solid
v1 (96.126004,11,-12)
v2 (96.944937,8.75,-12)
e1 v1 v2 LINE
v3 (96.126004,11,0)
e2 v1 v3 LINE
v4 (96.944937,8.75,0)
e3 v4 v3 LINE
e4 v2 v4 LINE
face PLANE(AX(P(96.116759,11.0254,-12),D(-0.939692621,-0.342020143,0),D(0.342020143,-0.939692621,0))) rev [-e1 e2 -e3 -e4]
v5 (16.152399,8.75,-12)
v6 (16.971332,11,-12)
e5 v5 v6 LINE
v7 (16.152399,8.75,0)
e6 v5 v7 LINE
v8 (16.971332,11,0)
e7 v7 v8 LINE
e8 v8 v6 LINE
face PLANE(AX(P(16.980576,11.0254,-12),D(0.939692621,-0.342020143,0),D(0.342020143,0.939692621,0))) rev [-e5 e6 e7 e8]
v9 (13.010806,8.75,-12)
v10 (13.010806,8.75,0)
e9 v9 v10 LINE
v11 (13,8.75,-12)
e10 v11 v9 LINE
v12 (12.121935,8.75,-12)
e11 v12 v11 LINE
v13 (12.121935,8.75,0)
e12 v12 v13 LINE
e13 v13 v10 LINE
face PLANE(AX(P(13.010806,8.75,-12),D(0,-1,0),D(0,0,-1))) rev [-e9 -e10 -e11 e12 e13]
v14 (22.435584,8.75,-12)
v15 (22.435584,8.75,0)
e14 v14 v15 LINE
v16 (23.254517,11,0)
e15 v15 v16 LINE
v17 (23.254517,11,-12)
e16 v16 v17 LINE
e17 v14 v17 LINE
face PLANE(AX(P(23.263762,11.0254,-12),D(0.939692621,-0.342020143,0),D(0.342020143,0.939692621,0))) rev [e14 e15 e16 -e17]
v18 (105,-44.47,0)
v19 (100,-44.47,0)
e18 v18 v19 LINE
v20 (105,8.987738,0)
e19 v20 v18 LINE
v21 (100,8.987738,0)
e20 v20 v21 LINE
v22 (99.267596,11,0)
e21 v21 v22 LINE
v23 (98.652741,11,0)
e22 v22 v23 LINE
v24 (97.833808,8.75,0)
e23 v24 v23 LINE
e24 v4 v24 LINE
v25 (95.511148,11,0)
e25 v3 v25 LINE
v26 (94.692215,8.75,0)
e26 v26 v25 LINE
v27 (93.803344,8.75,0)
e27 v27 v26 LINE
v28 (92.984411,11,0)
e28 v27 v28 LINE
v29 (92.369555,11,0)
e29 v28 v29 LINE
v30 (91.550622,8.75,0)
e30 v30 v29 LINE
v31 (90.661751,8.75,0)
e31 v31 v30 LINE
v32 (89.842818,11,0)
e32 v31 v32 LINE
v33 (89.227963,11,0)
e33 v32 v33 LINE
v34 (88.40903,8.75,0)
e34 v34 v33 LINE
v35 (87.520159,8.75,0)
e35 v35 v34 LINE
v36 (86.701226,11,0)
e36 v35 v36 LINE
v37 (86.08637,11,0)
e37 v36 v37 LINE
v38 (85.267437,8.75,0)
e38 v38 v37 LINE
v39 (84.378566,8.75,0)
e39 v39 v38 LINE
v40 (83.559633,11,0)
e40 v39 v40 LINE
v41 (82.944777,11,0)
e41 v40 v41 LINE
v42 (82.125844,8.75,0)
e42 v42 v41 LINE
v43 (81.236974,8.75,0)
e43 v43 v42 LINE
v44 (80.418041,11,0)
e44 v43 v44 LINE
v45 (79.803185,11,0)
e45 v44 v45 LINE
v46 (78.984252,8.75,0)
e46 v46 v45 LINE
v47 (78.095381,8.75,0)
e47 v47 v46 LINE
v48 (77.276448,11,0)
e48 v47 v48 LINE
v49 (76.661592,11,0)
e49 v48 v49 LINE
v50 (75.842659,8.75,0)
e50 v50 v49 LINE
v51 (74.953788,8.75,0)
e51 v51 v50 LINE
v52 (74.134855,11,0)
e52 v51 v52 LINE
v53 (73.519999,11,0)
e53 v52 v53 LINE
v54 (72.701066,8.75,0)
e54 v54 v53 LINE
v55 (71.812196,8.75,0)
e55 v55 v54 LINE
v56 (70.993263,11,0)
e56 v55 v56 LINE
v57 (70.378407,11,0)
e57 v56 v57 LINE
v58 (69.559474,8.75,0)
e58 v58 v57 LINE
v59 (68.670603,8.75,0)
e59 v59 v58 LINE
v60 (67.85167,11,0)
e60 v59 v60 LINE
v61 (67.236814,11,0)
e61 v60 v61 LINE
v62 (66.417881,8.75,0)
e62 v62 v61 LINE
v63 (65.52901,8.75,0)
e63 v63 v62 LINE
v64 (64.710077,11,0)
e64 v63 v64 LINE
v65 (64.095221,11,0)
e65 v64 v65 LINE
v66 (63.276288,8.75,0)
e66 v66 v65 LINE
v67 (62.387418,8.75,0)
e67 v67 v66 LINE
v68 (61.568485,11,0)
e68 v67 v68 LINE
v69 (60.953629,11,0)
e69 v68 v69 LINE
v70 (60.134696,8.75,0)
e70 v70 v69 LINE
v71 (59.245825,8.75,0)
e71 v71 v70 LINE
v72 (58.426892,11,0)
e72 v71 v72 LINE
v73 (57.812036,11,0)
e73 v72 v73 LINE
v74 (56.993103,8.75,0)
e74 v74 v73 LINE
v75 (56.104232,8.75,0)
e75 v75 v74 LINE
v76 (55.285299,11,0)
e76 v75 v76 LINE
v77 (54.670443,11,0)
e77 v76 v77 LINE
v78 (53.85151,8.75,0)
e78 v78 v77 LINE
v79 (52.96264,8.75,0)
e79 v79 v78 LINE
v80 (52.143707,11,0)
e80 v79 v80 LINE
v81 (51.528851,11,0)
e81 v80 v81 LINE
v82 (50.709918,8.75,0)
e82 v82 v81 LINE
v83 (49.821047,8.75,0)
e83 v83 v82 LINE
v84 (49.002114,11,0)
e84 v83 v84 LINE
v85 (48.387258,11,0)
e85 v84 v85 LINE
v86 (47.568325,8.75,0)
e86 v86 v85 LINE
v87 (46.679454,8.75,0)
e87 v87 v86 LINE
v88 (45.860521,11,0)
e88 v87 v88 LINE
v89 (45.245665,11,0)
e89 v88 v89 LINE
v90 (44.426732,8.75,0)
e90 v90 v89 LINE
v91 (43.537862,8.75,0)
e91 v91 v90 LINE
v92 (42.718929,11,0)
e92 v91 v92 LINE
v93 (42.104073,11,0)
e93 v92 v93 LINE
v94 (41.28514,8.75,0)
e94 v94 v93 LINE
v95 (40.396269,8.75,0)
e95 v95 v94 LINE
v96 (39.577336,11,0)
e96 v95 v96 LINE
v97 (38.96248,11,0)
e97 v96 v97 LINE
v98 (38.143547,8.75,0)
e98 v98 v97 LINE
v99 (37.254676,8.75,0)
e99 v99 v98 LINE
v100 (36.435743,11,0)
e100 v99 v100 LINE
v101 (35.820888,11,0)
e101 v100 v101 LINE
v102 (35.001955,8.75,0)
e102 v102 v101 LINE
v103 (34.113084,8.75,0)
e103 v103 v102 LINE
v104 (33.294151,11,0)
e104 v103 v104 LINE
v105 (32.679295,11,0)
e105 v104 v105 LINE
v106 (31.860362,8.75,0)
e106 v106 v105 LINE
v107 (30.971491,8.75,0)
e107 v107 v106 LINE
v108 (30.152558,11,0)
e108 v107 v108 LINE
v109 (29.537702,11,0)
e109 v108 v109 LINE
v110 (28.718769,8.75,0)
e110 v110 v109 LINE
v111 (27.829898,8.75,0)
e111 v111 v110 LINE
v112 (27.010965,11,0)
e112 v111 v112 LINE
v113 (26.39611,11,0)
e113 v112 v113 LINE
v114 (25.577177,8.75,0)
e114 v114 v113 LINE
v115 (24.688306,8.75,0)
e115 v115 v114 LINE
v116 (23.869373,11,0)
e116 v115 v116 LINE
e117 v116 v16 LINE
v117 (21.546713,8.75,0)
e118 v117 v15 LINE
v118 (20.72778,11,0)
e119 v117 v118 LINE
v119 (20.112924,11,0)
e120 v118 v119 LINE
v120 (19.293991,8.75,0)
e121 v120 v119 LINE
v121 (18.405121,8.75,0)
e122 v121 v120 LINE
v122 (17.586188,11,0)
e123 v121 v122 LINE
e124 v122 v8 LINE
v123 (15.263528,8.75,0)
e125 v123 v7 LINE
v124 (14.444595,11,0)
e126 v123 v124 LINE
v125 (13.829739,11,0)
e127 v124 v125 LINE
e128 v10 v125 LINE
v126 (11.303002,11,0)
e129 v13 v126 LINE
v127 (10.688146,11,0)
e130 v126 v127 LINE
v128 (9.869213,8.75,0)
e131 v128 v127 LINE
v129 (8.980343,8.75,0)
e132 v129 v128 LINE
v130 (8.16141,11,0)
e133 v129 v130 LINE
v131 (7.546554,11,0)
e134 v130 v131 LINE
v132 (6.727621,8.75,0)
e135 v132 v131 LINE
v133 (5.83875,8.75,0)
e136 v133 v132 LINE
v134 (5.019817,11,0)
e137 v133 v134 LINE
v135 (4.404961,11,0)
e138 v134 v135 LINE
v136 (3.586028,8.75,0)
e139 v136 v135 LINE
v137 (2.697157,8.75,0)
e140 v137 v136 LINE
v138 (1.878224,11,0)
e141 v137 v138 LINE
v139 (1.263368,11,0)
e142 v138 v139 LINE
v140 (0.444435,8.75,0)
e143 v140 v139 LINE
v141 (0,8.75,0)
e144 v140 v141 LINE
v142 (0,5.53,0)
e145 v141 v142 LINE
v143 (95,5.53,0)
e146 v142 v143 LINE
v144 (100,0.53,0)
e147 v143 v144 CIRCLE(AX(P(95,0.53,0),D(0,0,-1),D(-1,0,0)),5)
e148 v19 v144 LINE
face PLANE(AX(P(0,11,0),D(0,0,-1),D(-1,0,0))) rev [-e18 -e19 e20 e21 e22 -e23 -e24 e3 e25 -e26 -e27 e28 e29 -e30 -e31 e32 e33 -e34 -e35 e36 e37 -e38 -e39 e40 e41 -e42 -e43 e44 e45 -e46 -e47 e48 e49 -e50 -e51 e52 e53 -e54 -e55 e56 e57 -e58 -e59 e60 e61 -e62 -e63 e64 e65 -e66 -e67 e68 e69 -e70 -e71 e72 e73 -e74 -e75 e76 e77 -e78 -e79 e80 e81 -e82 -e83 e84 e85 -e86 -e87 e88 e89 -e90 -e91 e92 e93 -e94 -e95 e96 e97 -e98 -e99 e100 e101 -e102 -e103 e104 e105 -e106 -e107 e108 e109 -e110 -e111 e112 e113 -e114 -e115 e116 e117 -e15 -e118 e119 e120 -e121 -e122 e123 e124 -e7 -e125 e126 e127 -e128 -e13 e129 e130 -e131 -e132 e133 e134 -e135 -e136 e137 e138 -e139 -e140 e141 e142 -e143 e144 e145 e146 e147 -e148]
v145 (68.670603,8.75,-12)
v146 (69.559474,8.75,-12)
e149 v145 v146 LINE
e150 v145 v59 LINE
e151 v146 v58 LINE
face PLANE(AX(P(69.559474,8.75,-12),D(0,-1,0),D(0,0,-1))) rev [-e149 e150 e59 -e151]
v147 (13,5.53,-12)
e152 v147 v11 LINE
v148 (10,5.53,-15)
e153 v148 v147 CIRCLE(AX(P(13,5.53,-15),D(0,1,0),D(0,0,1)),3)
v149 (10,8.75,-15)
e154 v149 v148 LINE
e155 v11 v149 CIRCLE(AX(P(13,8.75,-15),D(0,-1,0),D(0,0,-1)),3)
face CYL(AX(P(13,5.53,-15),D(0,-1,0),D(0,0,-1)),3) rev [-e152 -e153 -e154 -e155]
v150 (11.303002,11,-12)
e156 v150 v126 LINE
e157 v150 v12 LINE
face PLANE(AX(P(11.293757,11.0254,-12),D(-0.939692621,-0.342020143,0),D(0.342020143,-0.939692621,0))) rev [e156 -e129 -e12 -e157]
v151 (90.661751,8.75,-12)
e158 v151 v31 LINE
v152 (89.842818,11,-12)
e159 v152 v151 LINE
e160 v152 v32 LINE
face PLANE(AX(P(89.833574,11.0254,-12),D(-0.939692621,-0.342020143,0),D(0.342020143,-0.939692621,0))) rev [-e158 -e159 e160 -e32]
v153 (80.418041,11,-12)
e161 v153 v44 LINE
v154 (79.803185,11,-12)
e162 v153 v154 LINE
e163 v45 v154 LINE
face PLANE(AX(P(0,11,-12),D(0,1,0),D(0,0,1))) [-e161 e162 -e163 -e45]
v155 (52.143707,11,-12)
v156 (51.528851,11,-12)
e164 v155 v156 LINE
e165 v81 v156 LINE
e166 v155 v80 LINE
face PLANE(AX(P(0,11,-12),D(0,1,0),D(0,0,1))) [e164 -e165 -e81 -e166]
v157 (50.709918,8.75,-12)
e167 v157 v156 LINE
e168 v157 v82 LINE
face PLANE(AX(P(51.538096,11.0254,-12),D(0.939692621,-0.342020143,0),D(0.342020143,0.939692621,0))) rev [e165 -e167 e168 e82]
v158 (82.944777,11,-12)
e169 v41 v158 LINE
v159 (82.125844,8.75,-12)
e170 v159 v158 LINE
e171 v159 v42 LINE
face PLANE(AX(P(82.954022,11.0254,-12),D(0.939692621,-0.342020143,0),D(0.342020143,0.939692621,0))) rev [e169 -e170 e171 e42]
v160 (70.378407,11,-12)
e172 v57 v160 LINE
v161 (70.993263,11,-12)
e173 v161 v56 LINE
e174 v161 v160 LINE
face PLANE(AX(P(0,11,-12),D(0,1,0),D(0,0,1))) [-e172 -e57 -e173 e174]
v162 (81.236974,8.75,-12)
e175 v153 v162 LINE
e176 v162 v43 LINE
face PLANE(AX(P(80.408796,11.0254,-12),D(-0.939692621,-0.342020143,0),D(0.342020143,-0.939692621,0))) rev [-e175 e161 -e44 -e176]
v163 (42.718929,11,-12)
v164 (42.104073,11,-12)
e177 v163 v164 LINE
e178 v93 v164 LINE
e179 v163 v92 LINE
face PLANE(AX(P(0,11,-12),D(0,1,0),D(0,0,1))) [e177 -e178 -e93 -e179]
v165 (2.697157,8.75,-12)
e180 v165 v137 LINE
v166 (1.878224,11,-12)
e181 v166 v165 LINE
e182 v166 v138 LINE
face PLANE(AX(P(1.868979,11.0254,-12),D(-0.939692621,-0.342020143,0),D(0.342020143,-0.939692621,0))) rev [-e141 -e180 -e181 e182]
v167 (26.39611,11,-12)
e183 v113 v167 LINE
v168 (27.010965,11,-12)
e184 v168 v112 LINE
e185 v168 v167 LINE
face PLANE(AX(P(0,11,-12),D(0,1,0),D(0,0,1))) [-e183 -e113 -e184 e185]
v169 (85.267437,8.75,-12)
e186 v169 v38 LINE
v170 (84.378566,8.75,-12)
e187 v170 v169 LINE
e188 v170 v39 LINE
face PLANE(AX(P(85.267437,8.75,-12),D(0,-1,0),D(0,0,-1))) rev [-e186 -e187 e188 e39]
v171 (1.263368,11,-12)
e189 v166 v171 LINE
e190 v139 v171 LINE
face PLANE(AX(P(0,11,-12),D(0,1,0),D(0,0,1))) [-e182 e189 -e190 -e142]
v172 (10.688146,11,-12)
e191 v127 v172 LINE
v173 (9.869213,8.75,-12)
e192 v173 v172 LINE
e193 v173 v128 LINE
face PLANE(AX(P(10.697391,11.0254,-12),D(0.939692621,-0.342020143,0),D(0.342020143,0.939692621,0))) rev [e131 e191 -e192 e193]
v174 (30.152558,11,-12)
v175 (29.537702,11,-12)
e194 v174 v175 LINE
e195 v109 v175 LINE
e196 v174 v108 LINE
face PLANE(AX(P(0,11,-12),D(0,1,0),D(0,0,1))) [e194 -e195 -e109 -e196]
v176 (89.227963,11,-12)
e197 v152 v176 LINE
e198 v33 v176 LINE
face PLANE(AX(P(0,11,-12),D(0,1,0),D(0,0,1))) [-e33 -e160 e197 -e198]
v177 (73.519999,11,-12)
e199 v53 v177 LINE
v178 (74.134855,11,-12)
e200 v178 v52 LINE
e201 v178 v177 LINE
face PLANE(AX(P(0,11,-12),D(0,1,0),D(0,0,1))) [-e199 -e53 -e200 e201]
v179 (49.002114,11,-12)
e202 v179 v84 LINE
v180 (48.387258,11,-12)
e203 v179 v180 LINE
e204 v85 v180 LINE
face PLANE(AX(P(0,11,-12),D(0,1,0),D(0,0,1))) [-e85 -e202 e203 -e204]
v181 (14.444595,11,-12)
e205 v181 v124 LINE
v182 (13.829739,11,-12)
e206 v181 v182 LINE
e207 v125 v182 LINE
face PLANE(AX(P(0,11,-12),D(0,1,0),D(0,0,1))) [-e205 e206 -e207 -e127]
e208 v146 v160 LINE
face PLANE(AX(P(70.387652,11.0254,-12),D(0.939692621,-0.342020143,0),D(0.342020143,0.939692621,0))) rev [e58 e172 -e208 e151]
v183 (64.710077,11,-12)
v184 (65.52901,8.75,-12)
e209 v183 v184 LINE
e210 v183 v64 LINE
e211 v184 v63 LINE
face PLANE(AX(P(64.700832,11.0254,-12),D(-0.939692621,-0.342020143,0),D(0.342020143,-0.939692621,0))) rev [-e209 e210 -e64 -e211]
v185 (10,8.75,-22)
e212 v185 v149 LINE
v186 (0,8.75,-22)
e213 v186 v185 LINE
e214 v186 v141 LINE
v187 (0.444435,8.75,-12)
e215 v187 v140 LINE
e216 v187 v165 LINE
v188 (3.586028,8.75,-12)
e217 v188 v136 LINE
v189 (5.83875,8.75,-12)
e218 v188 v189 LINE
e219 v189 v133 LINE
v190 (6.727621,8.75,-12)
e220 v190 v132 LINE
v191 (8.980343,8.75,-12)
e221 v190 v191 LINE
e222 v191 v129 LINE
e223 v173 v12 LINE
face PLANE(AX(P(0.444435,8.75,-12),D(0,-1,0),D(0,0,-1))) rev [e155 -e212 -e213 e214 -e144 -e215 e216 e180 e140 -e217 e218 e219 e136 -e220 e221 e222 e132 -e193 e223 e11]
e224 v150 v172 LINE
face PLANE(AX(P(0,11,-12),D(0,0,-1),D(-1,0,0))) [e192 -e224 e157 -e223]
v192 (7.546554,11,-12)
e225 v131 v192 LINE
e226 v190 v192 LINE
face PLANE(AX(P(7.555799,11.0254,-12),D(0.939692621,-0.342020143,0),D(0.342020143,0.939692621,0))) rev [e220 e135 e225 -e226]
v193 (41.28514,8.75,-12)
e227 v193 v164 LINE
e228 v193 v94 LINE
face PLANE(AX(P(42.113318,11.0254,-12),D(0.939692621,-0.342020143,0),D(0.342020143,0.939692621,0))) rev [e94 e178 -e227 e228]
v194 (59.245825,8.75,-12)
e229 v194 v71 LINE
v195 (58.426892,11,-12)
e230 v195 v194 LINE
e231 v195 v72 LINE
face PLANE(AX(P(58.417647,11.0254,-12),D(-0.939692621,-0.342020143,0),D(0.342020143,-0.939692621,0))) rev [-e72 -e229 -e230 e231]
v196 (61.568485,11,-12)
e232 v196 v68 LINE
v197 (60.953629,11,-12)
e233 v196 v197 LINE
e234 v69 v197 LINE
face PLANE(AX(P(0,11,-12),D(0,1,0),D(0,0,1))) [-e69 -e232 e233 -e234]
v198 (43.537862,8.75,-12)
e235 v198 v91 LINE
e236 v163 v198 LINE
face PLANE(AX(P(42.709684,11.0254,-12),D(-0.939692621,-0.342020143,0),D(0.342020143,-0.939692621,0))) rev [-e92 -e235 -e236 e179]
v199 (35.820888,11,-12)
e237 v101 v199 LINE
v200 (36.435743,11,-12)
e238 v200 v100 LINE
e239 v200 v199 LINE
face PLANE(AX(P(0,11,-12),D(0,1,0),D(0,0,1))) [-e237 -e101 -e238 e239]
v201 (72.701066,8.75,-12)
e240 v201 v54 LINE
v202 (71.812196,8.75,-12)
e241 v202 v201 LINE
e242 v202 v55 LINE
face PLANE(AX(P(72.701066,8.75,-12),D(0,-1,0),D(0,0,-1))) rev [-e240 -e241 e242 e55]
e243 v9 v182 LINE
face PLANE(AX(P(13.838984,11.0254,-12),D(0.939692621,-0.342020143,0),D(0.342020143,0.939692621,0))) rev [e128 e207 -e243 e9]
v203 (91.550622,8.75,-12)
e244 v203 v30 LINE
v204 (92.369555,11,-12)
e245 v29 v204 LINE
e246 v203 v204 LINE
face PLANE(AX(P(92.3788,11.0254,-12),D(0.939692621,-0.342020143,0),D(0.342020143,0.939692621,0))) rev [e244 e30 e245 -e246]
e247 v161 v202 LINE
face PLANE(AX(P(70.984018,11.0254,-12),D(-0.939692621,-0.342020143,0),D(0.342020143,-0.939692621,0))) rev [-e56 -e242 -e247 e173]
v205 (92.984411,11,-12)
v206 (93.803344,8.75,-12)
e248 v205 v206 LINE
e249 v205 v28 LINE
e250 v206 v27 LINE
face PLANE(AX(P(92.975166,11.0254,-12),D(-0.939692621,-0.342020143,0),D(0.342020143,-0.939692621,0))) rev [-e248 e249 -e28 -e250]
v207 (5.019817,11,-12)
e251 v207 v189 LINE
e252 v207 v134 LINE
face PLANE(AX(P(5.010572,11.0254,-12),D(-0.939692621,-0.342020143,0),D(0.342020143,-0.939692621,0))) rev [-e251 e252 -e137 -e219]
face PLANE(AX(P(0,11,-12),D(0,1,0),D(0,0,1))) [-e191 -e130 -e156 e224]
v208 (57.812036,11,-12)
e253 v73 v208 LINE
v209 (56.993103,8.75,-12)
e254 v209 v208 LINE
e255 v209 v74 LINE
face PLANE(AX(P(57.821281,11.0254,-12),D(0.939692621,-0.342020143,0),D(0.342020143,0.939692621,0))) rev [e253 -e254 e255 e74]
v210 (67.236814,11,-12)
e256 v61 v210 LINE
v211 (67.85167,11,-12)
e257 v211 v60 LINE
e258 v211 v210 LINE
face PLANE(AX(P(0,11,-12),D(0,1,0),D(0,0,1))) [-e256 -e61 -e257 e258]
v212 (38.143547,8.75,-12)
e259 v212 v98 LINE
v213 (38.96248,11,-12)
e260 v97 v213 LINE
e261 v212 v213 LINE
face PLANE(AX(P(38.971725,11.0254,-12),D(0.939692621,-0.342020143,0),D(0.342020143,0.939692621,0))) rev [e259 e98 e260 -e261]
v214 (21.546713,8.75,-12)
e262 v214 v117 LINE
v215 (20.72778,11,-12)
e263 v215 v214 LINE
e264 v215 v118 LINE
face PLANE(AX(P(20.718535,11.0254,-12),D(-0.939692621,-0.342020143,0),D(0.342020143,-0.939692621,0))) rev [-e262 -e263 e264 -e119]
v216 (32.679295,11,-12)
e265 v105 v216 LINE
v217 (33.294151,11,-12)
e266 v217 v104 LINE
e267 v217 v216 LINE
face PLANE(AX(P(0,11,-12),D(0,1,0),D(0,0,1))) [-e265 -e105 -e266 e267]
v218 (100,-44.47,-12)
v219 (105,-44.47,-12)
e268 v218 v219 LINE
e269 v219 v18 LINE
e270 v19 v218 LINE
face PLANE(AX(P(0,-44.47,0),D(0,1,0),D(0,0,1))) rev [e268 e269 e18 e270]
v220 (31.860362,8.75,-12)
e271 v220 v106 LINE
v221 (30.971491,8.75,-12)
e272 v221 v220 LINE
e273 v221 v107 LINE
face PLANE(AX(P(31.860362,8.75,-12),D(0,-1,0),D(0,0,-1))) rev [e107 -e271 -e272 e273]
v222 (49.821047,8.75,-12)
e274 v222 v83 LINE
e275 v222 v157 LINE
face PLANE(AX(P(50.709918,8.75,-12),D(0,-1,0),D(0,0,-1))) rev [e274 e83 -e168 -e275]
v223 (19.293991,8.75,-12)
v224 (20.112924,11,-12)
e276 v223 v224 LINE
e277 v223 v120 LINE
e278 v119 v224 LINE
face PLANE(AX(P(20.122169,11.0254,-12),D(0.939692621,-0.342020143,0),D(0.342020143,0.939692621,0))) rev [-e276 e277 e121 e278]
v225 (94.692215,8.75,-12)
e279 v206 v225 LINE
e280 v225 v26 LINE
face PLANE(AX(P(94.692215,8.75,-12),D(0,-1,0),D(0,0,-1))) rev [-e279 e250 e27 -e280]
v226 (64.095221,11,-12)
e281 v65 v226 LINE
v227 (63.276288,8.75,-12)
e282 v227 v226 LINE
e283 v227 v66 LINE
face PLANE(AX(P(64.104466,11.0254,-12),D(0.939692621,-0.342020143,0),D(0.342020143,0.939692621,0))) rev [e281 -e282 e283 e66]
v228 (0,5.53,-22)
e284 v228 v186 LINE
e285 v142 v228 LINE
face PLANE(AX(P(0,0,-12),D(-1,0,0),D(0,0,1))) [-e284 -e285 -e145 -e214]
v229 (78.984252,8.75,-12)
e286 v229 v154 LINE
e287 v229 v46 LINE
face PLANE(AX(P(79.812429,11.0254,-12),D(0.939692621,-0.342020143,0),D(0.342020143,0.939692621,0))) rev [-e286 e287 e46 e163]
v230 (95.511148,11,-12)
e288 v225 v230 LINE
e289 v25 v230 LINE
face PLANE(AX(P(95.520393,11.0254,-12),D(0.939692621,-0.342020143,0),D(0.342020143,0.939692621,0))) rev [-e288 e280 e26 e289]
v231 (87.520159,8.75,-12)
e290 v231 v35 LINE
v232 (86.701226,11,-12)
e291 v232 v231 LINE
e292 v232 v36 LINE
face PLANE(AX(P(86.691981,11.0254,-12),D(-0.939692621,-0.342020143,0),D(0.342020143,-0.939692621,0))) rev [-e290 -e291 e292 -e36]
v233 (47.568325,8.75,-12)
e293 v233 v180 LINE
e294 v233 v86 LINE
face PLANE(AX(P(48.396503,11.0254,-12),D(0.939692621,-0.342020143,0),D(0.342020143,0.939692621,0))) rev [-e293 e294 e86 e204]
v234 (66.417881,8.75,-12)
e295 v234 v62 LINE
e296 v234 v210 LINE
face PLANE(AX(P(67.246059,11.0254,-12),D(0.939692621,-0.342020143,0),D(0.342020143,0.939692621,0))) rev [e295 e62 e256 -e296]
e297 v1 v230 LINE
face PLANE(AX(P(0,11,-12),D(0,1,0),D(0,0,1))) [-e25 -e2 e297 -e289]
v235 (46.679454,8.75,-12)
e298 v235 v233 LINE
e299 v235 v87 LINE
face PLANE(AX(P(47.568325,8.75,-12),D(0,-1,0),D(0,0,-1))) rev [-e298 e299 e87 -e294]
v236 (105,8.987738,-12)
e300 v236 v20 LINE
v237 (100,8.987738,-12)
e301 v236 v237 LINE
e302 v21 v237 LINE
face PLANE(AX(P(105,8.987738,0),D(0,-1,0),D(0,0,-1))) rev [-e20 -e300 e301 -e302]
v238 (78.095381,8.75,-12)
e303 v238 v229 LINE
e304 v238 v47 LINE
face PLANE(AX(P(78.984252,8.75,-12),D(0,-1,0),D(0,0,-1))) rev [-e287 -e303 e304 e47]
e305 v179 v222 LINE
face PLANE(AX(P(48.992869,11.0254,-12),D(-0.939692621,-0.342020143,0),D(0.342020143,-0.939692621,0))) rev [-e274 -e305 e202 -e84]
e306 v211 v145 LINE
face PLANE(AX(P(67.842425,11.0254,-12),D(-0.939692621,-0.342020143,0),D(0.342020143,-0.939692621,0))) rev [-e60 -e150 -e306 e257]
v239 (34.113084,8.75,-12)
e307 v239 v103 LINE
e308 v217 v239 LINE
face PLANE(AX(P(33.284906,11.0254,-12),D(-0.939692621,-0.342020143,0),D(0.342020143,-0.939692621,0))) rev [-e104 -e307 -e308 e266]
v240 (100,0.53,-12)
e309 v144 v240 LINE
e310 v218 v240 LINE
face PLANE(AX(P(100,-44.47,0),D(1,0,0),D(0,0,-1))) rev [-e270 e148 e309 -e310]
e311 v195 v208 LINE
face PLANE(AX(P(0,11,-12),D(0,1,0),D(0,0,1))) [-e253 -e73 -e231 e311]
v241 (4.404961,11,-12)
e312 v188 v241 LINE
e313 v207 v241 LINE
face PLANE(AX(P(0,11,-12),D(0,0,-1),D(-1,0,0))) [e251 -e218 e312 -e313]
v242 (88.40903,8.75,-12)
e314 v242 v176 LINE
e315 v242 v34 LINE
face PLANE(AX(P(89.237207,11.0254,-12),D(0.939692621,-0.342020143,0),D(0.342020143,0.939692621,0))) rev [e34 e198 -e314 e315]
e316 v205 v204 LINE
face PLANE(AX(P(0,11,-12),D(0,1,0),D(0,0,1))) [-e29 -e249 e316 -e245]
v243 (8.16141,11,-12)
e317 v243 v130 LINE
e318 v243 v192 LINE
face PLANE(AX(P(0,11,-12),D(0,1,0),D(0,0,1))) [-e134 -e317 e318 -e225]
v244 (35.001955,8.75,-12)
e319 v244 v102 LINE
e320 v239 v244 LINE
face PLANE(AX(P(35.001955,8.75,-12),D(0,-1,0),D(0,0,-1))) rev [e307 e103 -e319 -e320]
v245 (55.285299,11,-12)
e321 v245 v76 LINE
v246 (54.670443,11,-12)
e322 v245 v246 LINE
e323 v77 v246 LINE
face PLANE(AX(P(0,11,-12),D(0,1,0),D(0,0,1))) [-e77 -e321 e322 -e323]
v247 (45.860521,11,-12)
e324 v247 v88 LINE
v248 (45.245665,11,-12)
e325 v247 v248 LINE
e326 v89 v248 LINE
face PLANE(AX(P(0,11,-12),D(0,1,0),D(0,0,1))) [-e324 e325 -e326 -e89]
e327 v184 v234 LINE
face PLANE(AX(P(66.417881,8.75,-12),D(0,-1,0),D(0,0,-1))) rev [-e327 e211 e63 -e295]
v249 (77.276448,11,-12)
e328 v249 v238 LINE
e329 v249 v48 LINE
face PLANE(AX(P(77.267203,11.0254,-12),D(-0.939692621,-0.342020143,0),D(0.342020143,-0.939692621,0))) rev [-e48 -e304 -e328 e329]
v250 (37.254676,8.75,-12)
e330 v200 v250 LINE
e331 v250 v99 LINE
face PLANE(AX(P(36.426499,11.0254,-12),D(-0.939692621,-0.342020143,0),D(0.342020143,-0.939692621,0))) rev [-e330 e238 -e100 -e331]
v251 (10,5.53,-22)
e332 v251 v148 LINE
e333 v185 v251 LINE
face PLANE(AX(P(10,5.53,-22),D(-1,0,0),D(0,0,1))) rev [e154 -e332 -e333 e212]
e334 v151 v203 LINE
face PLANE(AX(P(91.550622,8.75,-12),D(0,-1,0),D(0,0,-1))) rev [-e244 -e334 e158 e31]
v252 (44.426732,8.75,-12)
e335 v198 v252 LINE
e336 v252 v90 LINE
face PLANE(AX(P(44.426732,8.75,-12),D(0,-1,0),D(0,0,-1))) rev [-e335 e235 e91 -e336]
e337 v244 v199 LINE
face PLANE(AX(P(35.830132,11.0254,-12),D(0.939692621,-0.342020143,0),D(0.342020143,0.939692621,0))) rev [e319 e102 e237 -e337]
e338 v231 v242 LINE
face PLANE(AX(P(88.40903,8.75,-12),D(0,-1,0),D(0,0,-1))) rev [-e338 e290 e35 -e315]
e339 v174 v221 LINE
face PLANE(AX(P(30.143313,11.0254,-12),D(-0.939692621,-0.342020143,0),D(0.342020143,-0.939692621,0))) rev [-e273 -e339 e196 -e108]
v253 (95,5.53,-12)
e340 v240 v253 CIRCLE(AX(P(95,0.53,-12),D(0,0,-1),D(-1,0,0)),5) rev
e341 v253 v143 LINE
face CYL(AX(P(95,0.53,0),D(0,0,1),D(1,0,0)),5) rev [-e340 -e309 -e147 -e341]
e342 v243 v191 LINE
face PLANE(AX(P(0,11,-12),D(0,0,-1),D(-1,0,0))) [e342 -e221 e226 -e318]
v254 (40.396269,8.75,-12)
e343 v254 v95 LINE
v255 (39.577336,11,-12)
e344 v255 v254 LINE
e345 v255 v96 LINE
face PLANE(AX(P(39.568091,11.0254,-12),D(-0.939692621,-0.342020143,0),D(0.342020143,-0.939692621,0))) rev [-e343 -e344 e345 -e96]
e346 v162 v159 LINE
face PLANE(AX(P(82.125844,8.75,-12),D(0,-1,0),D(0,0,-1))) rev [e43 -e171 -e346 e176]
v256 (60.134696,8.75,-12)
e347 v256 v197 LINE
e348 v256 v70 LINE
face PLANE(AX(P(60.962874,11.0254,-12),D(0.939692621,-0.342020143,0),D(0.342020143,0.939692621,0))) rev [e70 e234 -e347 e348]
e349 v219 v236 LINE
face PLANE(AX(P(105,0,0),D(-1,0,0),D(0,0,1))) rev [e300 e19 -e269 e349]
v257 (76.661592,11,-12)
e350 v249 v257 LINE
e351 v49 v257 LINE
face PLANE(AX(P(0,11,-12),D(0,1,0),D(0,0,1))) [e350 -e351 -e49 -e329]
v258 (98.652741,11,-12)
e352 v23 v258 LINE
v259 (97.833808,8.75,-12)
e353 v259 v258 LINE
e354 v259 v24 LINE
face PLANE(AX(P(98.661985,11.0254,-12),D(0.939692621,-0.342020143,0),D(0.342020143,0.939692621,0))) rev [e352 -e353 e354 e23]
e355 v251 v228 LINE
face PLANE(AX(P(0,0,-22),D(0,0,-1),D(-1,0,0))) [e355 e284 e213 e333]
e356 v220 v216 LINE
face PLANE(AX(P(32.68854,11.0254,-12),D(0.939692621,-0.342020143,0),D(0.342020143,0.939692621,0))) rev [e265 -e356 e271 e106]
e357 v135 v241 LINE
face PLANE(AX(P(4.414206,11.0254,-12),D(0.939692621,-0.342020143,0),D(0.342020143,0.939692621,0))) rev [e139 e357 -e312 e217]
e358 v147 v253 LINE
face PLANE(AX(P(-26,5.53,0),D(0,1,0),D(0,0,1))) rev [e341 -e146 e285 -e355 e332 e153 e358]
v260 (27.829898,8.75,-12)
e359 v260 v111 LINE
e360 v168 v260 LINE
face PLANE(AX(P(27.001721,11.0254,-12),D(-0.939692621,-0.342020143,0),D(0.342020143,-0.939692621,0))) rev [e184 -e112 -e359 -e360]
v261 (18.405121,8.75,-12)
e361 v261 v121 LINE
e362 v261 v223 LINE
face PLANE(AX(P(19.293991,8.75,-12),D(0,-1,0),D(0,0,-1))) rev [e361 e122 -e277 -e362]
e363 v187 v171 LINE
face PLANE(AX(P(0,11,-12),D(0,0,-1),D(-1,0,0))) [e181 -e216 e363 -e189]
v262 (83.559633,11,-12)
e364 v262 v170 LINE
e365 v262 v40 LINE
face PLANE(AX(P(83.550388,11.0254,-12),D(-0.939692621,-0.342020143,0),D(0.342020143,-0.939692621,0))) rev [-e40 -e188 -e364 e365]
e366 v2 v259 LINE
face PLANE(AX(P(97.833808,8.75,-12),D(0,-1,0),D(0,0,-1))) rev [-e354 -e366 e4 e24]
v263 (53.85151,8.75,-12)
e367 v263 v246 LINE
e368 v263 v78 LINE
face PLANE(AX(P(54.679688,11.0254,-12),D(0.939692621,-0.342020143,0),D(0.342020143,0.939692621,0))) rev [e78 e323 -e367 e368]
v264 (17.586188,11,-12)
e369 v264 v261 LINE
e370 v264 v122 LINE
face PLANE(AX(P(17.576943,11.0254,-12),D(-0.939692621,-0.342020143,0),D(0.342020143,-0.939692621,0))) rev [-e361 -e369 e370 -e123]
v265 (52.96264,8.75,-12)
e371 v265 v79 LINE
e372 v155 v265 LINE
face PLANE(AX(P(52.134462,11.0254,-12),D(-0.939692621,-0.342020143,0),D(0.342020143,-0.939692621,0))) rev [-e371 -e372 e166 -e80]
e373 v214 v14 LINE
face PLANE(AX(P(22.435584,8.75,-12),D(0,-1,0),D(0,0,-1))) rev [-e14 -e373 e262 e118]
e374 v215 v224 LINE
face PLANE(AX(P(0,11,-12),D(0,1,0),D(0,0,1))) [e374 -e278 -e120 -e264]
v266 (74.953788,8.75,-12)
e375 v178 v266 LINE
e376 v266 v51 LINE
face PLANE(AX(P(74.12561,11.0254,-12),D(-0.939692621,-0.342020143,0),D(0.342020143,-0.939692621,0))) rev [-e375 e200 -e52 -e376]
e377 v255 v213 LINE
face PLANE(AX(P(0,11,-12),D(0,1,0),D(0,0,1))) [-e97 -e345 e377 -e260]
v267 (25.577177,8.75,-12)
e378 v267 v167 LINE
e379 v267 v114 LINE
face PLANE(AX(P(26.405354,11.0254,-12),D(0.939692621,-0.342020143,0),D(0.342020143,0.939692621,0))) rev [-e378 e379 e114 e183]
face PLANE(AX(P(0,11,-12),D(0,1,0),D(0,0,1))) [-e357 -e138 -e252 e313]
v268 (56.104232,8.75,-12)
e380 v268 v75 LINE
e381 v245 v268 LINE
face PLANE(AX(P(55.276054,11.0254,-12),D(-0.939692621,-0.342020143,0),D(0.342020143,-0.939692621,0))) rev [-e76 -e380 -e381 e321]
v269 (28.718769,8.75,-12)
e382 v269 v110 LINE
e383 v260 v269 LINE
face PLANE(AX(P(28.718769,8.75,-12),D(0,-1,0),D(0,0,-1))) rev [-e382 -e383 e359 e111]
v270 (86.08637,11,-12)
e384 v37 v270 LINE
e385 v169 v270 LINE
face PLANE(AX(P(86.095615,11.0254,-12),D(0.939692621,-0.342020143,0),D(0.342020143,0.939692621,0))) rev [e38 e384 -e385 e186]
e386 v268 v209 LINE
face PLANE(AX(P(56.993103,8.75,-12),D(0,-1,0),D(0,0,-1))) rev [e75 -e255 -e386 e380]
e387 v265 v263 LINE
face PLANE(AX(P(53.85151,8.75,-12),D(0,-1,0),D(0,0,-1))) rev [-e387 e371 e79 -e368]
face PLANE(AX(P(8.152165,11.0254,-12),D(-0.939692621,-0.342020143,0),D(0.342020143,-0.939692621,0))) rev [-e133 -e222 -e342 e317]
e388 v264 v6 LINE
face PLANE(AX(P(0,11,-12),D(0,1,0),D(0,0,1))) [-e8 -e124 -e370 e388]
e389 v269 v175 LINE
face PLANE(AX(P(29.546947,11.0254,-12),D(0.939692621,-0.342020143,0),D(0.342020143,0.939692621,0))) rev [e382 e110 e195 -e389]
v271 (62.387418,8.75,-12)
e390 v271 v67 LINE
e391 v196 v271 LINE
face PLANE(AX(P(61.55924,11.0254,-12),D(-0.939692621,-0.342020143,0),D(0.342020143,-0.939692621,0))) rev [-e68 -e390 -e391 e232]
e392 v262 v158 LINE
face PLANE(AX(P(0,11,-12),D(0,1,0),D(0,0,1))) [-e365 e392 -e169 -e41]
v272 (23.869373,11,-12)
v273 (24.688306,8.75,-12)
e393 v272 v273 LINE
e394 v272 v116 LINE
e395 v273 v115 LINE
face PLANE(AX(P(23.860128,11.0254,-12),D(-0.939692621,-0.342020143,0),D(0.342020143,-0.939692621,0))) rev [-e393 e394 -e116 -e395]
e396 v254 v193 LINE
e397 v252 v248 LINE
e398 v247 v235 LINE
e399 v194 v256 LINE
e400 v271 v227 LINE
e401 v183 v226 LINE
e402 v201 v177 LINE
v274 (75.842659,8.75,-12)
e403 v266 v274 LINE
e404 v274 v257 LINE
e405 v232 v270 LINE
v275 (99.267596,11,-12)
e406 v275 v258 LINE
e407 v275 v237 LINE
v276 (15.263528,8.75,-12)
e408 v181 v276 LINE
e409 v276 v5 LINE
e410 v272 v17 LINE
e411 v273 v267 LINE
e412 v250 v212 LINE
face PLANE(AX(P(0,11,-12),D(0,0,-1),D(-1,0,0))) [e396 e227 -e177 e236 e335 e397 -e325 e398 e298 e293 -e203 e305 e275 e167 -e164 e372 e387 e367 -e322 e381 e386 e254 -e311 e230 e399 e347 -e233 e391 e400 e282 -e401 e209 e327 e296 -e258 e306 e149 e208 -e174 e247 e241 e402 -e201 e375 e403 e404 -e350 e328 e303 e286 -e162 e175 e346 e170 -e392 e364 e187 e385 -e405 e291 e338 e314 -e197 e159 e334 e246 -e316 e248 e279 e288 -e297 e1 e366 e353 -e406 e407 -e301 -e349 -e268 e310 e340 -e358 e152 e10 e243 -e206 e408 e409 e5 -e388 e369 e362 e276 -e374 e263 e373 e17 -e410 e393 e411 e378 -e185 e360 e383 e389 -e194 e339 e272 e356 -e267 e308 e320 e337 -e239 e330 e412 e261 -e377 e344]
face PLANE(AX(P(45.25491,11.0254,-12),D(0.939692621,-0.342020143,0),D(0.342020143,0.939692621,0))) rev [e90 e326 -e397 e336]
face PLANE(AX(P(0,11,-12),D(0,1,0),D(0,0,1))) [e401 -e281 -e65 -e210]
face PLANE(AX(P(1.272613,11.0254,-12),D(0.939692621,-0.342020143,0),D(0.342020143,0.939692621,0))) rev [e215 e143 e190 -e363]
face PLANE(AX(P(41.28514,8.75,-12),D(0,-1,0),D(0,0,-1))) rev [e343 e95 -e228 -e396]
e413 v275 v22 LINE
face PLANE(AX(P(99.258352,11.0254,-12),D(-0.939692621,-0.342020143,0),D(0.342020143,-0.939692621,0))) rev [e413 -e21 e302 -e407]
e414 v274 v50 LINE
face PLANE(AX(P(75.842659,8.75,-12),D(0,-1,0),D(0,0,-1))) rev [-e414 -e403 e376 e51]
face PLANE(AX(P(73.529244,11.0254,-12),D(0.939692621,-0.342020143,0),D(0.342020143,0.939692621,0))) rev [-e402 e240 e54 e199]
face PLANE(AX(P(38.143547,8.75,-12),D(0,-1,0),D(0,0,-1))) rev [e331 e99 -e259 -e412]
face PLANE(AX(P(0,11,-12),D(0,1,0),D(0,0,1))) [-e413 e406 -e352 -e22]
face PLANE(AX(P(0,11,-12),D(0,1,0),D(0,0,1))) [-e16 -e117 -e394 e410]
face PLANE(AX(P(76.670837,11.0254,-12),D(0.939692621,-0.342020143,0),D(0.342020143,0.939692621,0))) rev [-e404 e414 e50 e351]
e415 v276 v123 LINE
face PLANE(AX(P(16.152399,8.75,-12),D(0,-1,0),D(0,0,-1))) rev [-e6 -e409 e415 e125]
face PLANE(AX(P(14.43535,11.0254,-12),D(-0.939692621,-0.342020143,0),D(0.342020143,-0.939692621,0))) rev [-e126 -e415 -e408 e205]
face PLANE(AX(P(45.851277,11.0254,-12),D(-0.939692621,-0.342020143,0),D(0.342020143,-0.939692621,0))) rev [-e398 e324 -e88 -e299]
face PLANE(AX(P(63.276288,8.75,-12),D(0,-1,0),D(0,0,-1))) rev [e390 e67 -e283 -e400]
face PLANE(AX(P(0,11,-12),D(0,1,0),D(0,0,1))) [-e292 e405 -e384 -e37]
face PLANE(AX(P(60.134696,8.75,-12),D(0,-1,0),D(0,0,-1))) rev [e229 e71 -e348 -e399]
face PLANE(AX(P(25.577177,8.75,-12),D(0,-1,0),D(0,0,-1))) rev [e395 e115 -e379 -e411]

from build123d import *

# Parameters (mm, degrees)
BLANKSKE_W          = 100
BLANKSKE_H          = 11
BLANK_DEPTH         = 12
TOOTHCUTSIM_DEPTH   = 102.316336294
TEETHCUTS_COUNT     = 33
TEETHCUTS_PITCH     = 3.14159265
SKETCH1_W           = 12
SKETCH1_H           = 5.53
CUT_EXTRUDE1_DEPTH  = 126
SKETCH2_W           = 12
SKETCH2_H           = 3.457737656
BOSS_EXTRUDE1_DEPTH = 5
SKETCH3_W           = 5
SKETCH3_H           = 12
BOSS_EXTRUDE2_DEPTH = 50
FILLET1_R           = 5
SKETCH4_W           = 10
SKETCH4_H           = 3.22
BOSS_EXTRUDE3_DEPTH = 10
FILLET2_R           = 3


with BuildPart() as part:
    # BlankSke → Blank (new body)
    with BuildSketch(Plane.XY):
        with Locations((50, 5.5)):
            Rectangle(BLANKSKE_W, BLANKSKE_H)
    extrude(amount=-BLANK_DEPTH)

    # TooCutSkeSim → ToothCutSim (cut, through all)
    with BuildSketch(Plane.XY):
        Polygon((0.44443537, 8.75), (-0.44443537, 8.75), (-1.272613241, 11.0254), (1.272613241, 11.0254), align=None)
    toothcutsim = extrude(amount=-TOOTHCUTSIM_DEPTH, mode=Mode.SUBTRACT)

    # TeethCuts: ToothCutSim ×33
    with Locations(*[(i * TEETHCUTS_PITCH, 0, 0) for i in range(1, TEETHCUTS_COUNT)]):
        add(toothcutsim, mode=Mode.SUBTRACT)

    # Sketch1 → Cut-Extrude1 (cut)
    with BuildSketch(Plane(origin=(100, 0, 0), x_dir=(0, 0, -1), z_dir=(1, 0, 0))):
        with Locations((6, 2.765)):
            Rectangle(SKETCH1_W, SKETCH1_H)
    extrude(amount=-CUT_EXTRUDE1_DEPTH, mode=Mode.SUBTRACT)

    # Sketch2 → Boss-Extrude1 (add)
    with BuildSketch(Plane(origin=(100, 0, 0), x_dir=(0, 0, -1), z_dir=(1, 0, 0))):
        with Locations((6, 7.258868828)):
            Rectangle(SKETCH2_W, SKETCH2_H)
    extrude(amount=BOSS_EXTRUDE1_DEPTH)

    # Sketch3 → Boss-Extrude2 (add)
    with BuildSketch(Plane.XZ.offset(-5.53)):
        with Locations((102.5, -6)):
            Rectangle(SKETCH3_W, SKETCH3_H)
    extrude(amount=BOSS_EXTRUDE2_DEPTH)

    # Fillet1
    fillet1_edges = [part.edges().sort_by_distance(p)[0] for p in [
        (100, 5.53, -6),
    ]]
    fillet(fillet1_edges, radius=FILLET1_R)

    # Sketch4 → Boss-Extrude3 (add)
    with BuildSketch(Plane(origin=(0, 0, -12), x_dir=(-1, 0, 0), z_dir=(0, 0, -1))):
        with Locations((-5, 7.14)):
            Rectangle(SKETCH4_W, SKETCH4_H)
    extrude(amount=BOSS_EXTRUDE3_DEPTH)

    # Fillet2
    # the kernel refuses this fillet: 3 mm, written as the material it adds along each edge
    with BuildSketch(Plane(origin=(10, 5.53, -12), x_dir=(1, 0, 0), z_dir=(0, 1, 0))) as fillet2_piece_1:
        with BuildLine():
            CenterArc((FILLET2_R, FILLET2_R), FILLET2_R, 180, 90)
            Line((0, FILLET2_R), (0, 0))
            Line((0, 0), (FILLET2_R, 0))
        make_face()
    extrude(amount=3.22)


solid = part.part
